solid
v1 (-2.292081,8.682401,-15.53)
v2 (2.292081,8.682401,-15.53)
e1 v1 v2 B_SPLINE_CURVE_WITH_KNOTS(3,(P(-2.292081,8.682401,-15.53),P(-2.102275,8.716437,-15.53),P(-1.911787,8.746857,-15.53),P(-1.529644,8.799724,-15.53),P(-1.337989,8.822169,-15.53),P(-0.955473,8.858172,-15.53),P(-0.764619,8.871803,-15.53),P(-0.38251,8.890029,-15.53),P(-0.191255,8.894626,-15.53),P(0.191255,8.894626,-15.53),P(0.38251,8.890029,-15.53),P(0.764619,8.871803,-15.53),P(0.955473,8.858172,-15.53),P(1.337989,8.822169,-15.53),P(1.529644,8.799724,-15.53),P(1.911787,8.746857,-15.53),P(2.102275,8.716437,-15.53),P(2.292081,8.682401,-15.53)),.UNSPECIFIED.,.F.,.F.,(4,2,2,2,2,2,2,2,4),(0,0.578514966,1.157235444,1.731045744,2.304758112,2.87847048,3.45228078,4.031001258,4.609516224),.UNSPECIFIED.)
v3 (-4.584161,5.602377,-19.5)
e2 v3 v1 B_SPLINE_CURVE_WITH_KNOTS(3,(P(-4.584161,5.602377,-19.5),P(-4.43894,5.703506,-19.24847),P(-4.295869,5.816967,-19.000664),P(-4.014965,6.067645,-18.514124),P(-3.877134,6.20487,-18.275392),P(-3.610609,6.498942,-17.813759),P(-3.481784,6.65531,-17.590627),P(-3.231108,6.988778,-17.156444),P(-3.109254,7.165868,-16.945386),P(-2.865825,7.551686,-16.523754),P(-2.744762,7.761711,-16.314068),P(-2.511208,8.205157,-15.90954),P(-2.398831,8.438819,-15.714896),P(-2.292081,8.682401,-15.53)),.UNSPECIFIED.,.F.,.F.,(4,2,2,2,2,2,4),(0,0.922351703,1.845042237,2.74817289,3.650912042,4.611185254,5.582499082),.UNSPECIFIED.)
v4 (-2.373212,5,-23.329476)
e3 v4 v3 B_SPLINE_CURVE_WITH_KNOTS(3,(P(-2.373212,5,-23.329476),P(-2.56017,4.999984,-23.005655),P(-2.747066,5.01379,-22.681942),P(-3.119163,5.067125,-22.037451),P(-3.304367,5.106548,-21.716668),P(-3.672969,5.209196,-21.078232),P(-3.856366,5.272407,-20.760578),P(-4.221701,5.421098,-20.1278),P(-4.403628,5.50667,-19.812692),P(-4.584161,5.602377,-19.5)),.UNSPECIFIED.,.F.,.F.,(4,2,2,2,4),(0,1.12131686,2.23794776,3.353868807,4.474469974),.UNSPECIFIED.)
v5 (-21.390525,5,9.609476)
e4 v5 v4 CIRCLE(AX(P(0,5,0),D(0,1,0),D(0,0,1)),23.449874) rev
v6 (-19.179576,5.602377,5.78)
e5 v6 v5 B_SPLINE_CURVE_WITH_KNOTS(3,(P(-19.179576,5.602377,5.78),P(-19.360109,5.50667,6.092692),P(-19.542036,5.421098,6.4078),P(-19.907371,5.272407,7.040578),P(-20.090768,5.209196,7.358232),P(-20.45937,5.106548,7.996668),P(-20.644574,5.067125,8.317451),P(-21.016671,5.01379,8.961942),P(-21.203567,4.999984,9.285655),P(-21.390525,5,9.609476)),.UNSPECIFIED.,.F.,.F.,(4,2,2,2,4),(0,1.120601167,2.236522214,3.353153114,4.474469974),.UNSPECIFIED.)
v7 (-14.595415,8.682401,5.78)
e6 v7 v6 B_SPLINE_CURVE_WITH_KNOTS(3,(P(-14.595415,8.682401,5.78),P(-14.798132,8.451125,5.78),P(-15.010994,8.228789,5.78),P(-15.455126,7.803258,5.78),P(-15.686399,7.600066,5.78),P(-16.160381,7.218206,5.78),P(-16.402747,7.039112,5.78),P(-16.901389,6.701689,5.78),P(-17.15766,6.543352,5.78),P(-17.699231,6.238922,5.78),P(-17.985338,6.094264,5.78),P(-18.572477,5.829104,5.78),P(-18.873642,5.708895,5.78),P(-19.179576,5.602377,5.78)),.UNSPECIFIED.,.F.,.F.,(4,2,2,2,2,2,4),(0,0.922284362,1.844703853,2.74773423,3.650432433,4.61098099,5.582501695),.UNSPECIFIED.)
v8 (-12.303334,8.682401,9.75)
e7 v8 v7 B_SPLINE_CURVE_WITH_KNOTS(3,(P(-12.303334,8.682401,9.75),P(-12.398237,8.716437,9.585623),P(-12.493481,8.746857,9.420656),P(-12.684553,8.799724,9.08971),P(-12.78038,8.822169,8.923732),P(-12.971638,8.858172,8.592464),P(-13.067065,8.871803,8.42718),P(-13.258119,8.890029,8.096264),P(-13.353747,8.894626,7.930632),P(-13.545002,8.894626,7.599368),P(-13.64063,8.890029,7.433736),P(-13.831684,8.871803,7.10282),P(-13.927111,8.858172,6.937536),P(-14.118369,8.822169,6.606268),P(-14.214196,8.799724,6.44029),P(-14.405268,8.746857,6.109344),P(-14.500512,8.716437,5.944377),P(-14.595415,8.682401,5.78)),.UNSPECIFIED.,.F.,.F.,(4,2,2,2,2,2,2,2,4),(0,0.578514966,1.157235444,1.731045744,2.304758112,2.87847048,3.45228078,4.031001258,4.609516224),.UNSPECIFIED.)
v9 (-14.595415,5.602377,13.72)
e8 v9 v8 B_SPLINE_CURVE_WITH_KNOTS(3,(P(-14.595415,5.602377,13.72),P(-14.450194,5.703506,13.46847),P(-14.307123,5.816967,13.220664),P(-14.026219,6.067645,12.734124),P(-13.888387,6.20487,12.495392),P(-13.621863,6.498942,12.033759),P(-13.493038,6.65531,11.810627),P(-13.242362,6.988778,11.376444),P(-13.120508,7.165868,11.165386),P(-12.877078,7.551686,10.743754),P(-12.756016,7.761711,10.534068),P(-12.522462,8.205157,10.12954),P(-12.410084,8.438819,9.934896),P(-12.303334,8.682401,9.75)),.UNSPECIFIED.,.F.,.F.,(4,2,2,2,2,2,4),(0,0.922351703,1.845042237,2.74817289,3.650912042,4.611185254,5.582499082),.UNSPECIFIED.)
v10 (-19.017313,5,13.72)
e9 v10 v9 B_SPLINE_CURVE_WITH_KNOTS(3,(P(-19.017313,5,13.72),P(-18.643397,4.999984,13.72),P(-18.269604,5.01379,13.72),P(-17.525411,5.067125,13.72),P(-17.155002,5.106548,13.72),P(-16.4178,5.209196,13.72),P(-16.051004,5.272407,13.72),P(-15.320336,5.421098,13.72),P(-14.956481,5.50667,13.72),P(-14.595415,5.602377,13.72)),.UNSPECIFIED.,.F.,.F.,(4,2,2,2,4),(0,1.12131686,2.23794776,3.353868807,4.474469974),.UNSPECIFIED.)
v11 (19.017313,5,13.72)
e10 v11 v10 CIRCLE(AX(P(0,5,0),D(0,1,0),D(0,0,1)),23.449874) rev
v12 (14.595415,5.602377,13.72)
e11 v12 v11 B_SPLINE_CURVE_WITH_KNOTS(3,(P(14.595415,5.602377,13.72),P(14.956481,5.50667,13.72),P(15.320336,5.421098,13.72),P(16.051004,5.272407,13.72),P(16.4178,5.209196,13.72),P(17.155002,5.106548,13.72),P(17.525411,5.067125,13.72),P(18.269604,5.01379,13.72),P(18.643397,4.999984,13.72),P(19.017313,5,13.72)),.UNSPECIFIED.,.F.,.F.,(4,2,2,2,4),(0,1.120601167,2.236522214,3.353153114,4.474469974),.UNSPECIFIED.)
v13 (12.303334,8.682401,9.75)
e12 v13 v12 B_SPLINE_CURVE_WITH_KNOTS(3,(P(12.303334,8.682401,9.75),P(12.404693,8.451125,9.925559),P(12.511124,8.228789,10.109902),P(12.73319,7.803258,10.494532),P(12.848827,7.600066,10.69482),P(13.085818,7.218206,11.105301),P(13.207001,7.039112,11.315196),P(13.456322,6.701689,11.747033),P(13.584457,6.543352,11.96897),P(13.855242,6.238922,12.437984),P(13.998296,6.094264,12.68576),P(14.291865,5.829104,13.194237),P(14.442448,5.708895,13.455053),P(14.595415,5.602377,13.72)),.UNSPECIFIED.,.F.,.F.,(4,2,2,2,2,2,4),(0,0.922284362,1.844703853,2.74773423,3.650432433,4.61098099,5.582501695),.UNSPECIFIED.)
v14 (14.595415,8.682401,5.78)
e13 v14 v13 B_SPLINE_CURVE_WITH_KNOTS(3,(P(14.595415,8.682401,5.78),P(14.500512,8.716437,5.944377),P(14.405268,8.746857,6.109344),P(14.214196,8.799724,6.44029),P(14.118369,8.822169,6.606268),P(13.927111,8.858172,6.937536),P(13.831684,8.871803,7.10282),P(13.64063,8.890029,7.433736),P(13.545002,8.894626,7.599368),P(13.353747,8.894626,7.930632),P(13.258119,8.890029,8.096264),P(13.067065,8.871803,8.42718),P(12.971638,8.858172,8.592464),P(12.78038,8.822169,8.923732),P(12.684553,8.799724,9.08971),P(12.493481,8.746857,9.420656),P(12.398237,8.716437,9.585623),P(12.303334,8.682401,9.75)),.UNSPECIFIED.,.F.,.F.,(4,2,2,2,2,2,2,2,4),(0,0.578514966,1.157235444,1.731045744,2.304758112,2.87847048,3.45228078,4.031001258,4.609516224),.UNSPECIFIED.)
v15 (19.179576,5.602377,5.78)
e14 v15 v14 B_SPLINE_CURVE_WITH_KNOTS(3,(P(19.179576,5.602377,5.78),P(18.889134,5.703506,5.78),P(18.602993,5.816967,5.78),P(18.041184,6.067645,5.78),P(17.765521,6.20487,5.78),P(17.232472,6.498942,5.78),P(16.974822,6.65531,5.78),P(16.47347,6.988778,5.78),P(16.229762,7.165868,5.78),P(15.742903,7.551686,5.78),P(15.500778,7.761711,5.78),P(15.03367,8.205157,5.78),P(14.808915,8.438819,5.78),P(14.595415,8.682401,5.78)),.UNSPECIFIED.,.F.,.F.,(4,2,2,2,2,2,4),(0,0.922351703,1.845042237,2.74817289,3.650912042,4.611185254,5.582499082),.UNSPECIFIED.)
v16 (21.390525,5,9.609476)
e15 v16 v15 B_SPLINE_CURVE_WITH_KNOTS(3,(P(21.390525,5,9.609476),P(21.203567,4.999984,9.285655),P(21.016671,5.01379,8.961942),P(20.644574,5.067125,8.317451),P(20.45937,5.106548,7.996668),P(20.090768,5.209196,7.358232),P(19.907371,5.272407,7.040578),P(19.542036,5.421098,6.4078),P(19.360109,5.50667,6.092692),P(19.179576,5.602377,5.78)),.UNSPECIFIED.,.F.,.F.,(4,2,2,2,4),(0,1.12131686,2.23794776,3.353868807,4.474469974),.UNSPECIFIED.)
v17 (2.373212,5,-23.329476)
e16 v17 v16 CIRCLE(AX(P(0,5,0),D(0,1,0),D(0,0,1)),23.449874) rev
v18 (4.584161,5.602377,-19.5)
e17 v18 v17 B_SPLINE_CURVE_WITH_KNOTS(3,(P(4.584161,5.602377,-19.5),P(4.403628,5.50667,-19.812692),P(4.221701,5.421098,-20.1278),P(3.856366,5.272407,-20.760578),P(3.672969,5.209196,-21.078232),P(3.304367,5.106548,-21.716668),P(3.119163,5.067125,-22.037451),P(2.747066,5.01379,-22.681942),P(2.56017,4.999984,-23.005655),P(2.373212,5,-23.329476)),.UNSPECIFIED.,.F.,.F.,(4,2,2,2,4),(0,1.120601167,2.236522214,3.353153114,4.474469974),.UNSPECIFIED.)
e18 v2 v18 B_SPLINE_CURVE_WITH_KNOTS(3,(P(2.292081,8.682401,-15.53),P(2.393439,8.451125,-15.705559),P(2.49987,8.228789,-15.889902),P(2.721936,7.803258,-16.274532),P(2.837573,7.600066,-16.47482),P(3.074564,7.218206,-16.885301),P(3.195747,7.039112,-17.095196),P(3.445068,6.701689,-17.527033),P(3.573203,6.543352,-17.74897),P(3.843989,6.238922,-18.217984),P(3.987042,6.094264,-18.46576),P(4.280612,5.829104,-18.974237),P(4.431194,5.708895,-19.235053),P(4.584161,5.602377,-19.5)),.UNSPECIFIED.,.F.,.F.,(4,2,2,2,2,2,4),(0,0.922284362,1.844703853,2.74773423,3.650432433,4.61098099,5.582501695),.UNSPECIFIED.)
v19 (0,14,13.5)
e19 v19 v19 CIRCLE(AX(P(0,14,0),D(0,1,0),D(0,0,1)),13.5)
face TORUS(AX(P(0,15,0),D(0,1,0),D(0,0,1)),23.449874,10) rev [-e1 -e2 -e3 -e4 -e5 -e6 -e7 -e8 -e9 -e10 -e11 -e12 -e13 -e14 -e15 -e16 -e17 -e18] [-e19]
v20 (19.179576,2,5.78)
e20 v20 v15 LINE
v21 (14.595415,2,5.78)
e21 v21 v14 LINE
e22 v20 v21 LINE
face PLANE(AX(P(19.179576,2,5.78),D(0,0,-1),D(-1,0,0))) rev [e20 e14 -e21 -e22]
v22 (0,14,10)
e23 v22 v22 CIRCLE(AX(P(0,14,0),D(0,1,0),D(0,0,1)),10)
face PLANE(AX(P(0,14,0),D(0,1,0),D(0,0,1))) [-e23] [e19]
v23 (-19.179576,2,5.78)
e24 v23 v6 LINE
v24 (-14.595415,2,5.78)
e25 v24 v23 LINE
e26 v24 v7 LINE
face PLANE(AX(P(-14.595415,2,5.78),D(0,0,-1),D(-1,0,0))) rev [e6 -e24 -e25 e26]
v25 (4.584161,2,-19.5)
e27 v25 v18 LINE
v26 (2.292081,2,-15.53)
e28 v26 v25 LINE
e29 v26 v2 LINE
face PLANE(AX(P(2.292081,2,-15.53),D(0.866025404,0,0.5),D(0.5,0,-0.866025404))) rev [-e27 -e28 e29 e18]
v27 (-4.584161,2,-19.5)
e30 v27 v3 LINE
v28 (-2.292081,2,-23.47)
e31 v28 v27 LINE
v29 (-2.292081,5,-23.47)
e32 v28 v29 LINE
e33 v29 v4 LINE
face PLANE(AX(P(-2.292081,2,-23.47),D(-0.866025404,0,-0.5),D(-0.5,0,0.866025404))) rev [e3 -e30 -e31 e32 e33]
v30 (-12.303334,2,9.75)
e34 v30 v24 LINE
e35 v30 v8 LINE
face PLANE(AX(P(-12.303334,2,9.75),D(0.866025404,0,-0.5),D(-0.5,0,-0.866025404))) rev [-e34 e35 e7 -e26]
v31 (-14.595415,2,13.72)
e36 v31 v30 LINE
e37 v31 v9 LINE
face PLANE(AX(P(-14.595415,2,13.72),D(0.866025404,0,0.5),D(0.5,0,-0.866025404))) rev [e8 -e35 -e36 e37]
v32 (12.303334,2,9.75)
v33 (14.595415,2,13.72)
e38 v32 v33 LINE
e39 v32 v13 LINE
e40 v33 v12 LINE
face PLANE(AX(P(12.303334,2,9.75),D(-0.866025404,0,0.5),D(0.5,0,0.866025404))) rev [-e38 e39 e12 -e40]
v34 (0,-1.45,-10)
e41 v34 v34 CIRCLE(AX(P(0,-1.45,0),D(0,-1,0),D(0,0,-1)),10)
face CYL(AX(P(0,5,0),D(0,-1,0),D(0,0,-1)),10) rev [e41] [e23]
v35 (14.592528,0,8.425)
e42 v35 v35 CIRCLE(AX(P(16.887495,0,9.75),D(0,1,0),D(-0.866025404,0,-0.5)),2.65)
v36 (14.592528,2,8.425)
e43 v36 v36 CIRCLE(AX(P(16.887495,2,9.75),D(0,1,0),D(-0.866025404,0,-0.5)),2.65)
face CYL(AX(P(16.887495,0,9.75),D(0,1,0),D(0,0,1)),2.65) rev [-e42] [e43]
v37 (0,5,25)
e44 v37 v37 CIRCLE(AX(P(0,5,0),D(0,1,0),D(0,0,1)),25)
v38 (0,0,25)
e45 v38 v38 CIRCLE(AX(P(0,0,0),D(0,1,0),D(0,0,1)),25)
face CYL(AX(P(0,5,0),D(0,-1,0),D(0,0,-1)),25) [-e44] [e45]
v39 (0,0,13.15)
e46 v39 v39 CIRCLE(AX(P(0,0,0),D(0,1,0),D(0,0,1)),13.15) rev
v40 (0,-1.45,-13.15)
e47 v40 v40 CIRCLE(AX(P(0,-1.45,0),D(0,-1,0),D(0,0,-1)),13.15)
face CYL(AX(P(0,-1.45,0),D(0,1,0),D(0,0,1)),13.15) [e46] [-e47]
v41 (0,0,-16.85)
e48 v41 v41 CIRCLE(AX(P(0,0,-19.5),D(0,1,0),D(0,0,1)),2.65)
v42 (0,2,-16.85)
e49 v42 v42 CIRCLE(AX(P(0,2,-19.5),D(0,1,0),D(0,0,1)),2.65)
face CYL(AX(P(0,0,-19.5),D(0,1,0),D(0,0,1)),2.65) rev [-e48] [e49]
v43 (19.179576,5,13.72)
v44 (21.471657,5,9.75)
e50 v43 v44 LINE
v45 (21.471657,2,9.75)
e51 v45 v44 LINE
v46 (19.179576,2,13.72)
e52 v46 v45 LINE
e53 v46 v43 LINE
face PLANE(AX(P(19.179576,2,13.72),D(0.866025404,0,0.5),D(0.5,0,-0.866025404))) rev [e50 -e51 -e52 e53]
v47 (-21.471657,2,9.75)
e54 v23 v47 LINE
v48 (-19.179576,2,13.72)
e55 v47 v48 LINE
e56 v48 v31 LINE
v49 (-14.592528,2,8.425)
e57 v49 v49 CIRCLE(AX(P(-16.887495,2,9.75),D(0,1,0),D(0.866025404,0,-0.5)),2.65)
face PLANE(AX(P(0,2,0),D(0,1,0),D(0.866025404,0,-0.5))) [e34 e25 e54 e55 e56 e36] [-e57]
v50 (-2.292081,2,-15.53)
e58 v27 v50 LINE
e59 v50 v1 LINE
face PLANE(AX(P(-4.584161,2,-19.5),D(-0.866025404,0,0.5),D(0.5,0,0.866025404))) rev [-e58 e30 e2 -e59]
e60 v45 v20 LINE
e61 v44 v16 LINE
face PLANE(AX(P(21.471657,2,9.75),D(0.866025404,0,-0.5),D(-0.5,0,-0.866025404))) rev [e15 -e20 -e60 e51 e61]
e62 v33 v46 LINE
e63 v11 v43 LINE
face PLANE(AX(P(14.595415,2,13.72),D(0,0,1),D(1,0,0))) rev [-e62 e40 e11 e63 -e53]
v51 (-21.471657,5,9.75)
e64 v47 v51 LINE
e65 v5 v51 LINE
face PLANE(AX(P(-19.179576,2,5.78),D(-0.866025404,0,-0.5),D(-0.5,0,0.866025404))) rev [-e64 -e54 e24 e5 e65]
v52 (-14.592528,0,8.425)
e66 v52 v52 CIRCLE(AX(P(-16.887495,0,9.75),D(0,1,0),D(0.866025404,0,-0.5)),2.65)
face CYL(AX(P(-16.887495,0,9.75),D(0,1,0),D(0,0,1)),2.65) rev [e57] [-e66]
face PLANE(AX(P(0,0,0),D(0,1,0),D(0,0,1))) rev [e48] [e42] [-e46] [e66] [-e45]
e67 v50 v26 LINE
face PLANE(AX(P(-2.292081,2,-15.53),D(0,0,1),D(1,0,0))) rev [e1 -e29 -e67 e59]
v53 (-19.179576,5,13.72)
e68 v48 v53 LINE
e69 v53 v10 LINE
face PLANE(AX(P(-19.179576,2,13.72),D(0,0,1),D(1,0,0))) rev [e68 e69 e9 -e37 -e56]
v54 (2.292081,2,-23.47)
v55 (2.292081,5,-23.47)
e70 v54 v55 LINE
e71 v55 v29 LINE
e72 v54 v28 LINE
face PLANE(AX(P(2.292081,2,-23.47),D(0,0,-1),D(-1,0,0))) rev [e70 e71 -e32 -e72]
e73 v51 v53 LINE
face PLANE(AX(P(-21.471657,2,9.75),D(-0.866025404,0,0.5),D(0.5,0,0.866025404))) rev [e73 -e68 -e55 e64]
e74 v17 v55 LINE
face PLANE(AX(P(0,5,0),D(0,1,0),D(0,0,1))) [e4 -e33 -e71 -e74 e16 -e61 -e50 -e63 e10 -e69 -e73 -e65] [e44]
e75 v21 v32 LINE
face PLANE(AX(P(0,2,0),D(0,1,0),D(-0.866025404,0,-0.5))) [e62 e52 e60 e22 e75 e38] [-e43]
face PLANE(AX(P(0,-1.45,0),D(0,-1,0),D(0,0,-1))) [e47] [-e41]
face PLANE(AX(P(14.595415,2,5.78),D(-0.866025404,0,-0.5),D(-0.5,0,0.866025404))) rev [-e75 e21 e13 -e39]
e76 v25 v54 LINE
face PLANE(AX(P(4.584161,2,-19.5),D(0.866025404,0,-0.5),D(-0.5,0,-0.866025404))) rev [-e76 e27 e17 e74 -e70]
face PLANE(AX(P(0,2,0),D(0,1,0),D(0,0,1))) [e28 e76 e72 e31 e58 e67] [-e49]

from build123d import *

# Parameters (mm, degrees)
SKETCH1_R           = 25
SKETCH1_R_2         = 10
BOSS_EXTRUDE1_DEPTH = 5
CUT_EXTRUDE1_DEPTH  = 3
SKETCH4_R           = 2.65
CUT_EXTRUDE2_DEPTH  = 36.482389998
CIRPATTERN1_COUNT   = 3
SKETCH6_R           = 13.5
SKETCH6_R_2         = 10
BOSS_EXTRUDE2_DEPTH = 14
FILLET1_START       = 5
FILLET1_2_DEPTH     = 9
BOSS_EXTRUDE3_START = 1.45
SKETCH7_R           = 13.15
SKETCH7_R_2         = 10
BOSS_EXTRUDE3_DEPTH = 1.45


with BuildPart() as part:
    # Sketch1 → Boss-Extrude1 (new body)
    with BuildSketch(Plane(origin=(0, 0, 0), x_dir=(1, 0, 0), z_dir=(0, 1, 0))):
        with Locations(Location((0, 0, 0), (0, 0, 270))):
            Circle(SKETCH1_R)
        with Locations(Location((0, 0, 0), (0, 0, 270))):
            Circle(SKETCH1_R_2, mode=Mode.SUBTRACT)
    extrude(amount=BOSS_EXTRUDE1_DEPTH)

    # Sketch3 → Cut-Extrude1 (cut)
    with BuildSketch(Plane(origin=(0, 5, 0), x_dir=(1, 0, 0), z_dir=(0, 1, 0))):
        Polygon((4.584161137, 19.5), (2.292080569, 23.47), (-2.292080569, 23.47), (-4.584161137, 19.5), (-2.292080569, 15.53), (2.292080569, 15.53), align=None)
    cut_extrude1 = extrude(amount=-CUT_EXTRUDE1_DEPTH, mode=Mode.SUBTRACT)

    # Sketch4 → Cut-Extrude2 (cut, through all)
    with BuildSketch(Plane(origin=(0, 2, 0), x_dir=(1, 0, 0), z_dir=(0, 1, 0))):
        with Locations(Location((0, 19.5, 0), (0, 0, 270))):
            Circle(SKETCH4_R)
    cut_extrude2 = extrude(amount=-CUT_EXTRUDE2_DEPTH, mode=Mode.SUBTRACT)

    # CirPattern1: Cut-Extrude1, Cut-Extrude2 ×3 about axis
    cirpattern1_axis = Axis((0, 0, 0), (0, 1, 0))
    add([cut_extrude1.rotate(cirpattern1_axis, i * 360 / CIRPATTERN1_COUNT) for i in range(1, CIRPATTERN1_COUNT)], mode=Mode.SUBTRACT)
    add([cut_extrude2.rotate(cirpattern1_axis, i * 360 / CIRPATTERN1_COUNT) for i in range(1, CIRPATTERN1_COUNT)], mode=Mode.SUBTRACT)

    # Sketch6 → Boss-Extrude2 (add)
    with BuildSketch(Plane(origin=(0, 0, 0), x_dir=(1, 0, 0), z_dir=(0, 1, 0))):
        with Locations(Location((0, 0, 0), (0, 0, 270))):
            Circle(SKETCH6_R)
        with Locations(Location((0, 0, 0), (0, 0, 270))):
            Circle(SKETCH6_R_2, mode=Mode.SUBTRACT)
    extrude(amount=BOSS_EXTRUDE2_DEPTH)

    # Fillet1: read off the stored shape, not the designer's step
    # Fillet1 outline → Fillet1 (revolve)
    with BuildSketch(Plane.XY):
        with BuildLine():
            ThreePointArc((23.449874371, 5), (16.741670439, 7.583801513), (13.5, 14))
            Line((13.5, 14), (13.5, 5))
            Line((13.5, 5), (23.449874371, 5))
        make_face()
    revolve(axis=Axis((0, 0, 0), (0, 1, 0)))

    # Fillet1 2 outline → Fillet1 2 (cut)
    with BuildSketch(Plane(origin=(0, 0, 0), x_dir=(1, 0, 0), z_dir=(0, 1, 0)).offset(FILLET1_START)):
        Polygon((-2.292080569, 15.53), (2.292080569, 15.53), (4.584161137, 19.5), (2.292080569, 23.47), (1.408734657, 25), (-1.408734657, 25), (-2.292080569, 23.47), (-4.584161137, 19.5), align=None)
        Polygon((23, -13.72), (23, -12.397168574), (19.179575942, -5.78), (14.595414805, -5.78), (12.303334236, -9.75), (14.595414805, -13.72), align=None)
        Polygon((-19.179575942, -5.78), (-23, -12.397168574), (-23, -13.72), (-14.595414805, -13.72), (-12.303334236, -9.75), (-14.595414805, -5.78), align=None)
    extrude(amount=FILLET1_2_DEPTH, mode=Mode.SUBTRACT)

    # Sketch7 → Boss-Extrude3 (add)
    with BuildSketch(Plane.XZ.offset(BOSS_EXTRUDE3_START)):
        with Locations(Location((0, 0, 0), (0, 0, 90))):
            Circle(SKETCH7_R)
        with Locations(Location((0, 0, 0), (0, 0, 270))):
            Circle(SKETCH7_R_2, mode=Mode.SUBTRACT)
    extrude(amount=-BOSS_EXTRUDE3_DEPTH)


solid = part.part
